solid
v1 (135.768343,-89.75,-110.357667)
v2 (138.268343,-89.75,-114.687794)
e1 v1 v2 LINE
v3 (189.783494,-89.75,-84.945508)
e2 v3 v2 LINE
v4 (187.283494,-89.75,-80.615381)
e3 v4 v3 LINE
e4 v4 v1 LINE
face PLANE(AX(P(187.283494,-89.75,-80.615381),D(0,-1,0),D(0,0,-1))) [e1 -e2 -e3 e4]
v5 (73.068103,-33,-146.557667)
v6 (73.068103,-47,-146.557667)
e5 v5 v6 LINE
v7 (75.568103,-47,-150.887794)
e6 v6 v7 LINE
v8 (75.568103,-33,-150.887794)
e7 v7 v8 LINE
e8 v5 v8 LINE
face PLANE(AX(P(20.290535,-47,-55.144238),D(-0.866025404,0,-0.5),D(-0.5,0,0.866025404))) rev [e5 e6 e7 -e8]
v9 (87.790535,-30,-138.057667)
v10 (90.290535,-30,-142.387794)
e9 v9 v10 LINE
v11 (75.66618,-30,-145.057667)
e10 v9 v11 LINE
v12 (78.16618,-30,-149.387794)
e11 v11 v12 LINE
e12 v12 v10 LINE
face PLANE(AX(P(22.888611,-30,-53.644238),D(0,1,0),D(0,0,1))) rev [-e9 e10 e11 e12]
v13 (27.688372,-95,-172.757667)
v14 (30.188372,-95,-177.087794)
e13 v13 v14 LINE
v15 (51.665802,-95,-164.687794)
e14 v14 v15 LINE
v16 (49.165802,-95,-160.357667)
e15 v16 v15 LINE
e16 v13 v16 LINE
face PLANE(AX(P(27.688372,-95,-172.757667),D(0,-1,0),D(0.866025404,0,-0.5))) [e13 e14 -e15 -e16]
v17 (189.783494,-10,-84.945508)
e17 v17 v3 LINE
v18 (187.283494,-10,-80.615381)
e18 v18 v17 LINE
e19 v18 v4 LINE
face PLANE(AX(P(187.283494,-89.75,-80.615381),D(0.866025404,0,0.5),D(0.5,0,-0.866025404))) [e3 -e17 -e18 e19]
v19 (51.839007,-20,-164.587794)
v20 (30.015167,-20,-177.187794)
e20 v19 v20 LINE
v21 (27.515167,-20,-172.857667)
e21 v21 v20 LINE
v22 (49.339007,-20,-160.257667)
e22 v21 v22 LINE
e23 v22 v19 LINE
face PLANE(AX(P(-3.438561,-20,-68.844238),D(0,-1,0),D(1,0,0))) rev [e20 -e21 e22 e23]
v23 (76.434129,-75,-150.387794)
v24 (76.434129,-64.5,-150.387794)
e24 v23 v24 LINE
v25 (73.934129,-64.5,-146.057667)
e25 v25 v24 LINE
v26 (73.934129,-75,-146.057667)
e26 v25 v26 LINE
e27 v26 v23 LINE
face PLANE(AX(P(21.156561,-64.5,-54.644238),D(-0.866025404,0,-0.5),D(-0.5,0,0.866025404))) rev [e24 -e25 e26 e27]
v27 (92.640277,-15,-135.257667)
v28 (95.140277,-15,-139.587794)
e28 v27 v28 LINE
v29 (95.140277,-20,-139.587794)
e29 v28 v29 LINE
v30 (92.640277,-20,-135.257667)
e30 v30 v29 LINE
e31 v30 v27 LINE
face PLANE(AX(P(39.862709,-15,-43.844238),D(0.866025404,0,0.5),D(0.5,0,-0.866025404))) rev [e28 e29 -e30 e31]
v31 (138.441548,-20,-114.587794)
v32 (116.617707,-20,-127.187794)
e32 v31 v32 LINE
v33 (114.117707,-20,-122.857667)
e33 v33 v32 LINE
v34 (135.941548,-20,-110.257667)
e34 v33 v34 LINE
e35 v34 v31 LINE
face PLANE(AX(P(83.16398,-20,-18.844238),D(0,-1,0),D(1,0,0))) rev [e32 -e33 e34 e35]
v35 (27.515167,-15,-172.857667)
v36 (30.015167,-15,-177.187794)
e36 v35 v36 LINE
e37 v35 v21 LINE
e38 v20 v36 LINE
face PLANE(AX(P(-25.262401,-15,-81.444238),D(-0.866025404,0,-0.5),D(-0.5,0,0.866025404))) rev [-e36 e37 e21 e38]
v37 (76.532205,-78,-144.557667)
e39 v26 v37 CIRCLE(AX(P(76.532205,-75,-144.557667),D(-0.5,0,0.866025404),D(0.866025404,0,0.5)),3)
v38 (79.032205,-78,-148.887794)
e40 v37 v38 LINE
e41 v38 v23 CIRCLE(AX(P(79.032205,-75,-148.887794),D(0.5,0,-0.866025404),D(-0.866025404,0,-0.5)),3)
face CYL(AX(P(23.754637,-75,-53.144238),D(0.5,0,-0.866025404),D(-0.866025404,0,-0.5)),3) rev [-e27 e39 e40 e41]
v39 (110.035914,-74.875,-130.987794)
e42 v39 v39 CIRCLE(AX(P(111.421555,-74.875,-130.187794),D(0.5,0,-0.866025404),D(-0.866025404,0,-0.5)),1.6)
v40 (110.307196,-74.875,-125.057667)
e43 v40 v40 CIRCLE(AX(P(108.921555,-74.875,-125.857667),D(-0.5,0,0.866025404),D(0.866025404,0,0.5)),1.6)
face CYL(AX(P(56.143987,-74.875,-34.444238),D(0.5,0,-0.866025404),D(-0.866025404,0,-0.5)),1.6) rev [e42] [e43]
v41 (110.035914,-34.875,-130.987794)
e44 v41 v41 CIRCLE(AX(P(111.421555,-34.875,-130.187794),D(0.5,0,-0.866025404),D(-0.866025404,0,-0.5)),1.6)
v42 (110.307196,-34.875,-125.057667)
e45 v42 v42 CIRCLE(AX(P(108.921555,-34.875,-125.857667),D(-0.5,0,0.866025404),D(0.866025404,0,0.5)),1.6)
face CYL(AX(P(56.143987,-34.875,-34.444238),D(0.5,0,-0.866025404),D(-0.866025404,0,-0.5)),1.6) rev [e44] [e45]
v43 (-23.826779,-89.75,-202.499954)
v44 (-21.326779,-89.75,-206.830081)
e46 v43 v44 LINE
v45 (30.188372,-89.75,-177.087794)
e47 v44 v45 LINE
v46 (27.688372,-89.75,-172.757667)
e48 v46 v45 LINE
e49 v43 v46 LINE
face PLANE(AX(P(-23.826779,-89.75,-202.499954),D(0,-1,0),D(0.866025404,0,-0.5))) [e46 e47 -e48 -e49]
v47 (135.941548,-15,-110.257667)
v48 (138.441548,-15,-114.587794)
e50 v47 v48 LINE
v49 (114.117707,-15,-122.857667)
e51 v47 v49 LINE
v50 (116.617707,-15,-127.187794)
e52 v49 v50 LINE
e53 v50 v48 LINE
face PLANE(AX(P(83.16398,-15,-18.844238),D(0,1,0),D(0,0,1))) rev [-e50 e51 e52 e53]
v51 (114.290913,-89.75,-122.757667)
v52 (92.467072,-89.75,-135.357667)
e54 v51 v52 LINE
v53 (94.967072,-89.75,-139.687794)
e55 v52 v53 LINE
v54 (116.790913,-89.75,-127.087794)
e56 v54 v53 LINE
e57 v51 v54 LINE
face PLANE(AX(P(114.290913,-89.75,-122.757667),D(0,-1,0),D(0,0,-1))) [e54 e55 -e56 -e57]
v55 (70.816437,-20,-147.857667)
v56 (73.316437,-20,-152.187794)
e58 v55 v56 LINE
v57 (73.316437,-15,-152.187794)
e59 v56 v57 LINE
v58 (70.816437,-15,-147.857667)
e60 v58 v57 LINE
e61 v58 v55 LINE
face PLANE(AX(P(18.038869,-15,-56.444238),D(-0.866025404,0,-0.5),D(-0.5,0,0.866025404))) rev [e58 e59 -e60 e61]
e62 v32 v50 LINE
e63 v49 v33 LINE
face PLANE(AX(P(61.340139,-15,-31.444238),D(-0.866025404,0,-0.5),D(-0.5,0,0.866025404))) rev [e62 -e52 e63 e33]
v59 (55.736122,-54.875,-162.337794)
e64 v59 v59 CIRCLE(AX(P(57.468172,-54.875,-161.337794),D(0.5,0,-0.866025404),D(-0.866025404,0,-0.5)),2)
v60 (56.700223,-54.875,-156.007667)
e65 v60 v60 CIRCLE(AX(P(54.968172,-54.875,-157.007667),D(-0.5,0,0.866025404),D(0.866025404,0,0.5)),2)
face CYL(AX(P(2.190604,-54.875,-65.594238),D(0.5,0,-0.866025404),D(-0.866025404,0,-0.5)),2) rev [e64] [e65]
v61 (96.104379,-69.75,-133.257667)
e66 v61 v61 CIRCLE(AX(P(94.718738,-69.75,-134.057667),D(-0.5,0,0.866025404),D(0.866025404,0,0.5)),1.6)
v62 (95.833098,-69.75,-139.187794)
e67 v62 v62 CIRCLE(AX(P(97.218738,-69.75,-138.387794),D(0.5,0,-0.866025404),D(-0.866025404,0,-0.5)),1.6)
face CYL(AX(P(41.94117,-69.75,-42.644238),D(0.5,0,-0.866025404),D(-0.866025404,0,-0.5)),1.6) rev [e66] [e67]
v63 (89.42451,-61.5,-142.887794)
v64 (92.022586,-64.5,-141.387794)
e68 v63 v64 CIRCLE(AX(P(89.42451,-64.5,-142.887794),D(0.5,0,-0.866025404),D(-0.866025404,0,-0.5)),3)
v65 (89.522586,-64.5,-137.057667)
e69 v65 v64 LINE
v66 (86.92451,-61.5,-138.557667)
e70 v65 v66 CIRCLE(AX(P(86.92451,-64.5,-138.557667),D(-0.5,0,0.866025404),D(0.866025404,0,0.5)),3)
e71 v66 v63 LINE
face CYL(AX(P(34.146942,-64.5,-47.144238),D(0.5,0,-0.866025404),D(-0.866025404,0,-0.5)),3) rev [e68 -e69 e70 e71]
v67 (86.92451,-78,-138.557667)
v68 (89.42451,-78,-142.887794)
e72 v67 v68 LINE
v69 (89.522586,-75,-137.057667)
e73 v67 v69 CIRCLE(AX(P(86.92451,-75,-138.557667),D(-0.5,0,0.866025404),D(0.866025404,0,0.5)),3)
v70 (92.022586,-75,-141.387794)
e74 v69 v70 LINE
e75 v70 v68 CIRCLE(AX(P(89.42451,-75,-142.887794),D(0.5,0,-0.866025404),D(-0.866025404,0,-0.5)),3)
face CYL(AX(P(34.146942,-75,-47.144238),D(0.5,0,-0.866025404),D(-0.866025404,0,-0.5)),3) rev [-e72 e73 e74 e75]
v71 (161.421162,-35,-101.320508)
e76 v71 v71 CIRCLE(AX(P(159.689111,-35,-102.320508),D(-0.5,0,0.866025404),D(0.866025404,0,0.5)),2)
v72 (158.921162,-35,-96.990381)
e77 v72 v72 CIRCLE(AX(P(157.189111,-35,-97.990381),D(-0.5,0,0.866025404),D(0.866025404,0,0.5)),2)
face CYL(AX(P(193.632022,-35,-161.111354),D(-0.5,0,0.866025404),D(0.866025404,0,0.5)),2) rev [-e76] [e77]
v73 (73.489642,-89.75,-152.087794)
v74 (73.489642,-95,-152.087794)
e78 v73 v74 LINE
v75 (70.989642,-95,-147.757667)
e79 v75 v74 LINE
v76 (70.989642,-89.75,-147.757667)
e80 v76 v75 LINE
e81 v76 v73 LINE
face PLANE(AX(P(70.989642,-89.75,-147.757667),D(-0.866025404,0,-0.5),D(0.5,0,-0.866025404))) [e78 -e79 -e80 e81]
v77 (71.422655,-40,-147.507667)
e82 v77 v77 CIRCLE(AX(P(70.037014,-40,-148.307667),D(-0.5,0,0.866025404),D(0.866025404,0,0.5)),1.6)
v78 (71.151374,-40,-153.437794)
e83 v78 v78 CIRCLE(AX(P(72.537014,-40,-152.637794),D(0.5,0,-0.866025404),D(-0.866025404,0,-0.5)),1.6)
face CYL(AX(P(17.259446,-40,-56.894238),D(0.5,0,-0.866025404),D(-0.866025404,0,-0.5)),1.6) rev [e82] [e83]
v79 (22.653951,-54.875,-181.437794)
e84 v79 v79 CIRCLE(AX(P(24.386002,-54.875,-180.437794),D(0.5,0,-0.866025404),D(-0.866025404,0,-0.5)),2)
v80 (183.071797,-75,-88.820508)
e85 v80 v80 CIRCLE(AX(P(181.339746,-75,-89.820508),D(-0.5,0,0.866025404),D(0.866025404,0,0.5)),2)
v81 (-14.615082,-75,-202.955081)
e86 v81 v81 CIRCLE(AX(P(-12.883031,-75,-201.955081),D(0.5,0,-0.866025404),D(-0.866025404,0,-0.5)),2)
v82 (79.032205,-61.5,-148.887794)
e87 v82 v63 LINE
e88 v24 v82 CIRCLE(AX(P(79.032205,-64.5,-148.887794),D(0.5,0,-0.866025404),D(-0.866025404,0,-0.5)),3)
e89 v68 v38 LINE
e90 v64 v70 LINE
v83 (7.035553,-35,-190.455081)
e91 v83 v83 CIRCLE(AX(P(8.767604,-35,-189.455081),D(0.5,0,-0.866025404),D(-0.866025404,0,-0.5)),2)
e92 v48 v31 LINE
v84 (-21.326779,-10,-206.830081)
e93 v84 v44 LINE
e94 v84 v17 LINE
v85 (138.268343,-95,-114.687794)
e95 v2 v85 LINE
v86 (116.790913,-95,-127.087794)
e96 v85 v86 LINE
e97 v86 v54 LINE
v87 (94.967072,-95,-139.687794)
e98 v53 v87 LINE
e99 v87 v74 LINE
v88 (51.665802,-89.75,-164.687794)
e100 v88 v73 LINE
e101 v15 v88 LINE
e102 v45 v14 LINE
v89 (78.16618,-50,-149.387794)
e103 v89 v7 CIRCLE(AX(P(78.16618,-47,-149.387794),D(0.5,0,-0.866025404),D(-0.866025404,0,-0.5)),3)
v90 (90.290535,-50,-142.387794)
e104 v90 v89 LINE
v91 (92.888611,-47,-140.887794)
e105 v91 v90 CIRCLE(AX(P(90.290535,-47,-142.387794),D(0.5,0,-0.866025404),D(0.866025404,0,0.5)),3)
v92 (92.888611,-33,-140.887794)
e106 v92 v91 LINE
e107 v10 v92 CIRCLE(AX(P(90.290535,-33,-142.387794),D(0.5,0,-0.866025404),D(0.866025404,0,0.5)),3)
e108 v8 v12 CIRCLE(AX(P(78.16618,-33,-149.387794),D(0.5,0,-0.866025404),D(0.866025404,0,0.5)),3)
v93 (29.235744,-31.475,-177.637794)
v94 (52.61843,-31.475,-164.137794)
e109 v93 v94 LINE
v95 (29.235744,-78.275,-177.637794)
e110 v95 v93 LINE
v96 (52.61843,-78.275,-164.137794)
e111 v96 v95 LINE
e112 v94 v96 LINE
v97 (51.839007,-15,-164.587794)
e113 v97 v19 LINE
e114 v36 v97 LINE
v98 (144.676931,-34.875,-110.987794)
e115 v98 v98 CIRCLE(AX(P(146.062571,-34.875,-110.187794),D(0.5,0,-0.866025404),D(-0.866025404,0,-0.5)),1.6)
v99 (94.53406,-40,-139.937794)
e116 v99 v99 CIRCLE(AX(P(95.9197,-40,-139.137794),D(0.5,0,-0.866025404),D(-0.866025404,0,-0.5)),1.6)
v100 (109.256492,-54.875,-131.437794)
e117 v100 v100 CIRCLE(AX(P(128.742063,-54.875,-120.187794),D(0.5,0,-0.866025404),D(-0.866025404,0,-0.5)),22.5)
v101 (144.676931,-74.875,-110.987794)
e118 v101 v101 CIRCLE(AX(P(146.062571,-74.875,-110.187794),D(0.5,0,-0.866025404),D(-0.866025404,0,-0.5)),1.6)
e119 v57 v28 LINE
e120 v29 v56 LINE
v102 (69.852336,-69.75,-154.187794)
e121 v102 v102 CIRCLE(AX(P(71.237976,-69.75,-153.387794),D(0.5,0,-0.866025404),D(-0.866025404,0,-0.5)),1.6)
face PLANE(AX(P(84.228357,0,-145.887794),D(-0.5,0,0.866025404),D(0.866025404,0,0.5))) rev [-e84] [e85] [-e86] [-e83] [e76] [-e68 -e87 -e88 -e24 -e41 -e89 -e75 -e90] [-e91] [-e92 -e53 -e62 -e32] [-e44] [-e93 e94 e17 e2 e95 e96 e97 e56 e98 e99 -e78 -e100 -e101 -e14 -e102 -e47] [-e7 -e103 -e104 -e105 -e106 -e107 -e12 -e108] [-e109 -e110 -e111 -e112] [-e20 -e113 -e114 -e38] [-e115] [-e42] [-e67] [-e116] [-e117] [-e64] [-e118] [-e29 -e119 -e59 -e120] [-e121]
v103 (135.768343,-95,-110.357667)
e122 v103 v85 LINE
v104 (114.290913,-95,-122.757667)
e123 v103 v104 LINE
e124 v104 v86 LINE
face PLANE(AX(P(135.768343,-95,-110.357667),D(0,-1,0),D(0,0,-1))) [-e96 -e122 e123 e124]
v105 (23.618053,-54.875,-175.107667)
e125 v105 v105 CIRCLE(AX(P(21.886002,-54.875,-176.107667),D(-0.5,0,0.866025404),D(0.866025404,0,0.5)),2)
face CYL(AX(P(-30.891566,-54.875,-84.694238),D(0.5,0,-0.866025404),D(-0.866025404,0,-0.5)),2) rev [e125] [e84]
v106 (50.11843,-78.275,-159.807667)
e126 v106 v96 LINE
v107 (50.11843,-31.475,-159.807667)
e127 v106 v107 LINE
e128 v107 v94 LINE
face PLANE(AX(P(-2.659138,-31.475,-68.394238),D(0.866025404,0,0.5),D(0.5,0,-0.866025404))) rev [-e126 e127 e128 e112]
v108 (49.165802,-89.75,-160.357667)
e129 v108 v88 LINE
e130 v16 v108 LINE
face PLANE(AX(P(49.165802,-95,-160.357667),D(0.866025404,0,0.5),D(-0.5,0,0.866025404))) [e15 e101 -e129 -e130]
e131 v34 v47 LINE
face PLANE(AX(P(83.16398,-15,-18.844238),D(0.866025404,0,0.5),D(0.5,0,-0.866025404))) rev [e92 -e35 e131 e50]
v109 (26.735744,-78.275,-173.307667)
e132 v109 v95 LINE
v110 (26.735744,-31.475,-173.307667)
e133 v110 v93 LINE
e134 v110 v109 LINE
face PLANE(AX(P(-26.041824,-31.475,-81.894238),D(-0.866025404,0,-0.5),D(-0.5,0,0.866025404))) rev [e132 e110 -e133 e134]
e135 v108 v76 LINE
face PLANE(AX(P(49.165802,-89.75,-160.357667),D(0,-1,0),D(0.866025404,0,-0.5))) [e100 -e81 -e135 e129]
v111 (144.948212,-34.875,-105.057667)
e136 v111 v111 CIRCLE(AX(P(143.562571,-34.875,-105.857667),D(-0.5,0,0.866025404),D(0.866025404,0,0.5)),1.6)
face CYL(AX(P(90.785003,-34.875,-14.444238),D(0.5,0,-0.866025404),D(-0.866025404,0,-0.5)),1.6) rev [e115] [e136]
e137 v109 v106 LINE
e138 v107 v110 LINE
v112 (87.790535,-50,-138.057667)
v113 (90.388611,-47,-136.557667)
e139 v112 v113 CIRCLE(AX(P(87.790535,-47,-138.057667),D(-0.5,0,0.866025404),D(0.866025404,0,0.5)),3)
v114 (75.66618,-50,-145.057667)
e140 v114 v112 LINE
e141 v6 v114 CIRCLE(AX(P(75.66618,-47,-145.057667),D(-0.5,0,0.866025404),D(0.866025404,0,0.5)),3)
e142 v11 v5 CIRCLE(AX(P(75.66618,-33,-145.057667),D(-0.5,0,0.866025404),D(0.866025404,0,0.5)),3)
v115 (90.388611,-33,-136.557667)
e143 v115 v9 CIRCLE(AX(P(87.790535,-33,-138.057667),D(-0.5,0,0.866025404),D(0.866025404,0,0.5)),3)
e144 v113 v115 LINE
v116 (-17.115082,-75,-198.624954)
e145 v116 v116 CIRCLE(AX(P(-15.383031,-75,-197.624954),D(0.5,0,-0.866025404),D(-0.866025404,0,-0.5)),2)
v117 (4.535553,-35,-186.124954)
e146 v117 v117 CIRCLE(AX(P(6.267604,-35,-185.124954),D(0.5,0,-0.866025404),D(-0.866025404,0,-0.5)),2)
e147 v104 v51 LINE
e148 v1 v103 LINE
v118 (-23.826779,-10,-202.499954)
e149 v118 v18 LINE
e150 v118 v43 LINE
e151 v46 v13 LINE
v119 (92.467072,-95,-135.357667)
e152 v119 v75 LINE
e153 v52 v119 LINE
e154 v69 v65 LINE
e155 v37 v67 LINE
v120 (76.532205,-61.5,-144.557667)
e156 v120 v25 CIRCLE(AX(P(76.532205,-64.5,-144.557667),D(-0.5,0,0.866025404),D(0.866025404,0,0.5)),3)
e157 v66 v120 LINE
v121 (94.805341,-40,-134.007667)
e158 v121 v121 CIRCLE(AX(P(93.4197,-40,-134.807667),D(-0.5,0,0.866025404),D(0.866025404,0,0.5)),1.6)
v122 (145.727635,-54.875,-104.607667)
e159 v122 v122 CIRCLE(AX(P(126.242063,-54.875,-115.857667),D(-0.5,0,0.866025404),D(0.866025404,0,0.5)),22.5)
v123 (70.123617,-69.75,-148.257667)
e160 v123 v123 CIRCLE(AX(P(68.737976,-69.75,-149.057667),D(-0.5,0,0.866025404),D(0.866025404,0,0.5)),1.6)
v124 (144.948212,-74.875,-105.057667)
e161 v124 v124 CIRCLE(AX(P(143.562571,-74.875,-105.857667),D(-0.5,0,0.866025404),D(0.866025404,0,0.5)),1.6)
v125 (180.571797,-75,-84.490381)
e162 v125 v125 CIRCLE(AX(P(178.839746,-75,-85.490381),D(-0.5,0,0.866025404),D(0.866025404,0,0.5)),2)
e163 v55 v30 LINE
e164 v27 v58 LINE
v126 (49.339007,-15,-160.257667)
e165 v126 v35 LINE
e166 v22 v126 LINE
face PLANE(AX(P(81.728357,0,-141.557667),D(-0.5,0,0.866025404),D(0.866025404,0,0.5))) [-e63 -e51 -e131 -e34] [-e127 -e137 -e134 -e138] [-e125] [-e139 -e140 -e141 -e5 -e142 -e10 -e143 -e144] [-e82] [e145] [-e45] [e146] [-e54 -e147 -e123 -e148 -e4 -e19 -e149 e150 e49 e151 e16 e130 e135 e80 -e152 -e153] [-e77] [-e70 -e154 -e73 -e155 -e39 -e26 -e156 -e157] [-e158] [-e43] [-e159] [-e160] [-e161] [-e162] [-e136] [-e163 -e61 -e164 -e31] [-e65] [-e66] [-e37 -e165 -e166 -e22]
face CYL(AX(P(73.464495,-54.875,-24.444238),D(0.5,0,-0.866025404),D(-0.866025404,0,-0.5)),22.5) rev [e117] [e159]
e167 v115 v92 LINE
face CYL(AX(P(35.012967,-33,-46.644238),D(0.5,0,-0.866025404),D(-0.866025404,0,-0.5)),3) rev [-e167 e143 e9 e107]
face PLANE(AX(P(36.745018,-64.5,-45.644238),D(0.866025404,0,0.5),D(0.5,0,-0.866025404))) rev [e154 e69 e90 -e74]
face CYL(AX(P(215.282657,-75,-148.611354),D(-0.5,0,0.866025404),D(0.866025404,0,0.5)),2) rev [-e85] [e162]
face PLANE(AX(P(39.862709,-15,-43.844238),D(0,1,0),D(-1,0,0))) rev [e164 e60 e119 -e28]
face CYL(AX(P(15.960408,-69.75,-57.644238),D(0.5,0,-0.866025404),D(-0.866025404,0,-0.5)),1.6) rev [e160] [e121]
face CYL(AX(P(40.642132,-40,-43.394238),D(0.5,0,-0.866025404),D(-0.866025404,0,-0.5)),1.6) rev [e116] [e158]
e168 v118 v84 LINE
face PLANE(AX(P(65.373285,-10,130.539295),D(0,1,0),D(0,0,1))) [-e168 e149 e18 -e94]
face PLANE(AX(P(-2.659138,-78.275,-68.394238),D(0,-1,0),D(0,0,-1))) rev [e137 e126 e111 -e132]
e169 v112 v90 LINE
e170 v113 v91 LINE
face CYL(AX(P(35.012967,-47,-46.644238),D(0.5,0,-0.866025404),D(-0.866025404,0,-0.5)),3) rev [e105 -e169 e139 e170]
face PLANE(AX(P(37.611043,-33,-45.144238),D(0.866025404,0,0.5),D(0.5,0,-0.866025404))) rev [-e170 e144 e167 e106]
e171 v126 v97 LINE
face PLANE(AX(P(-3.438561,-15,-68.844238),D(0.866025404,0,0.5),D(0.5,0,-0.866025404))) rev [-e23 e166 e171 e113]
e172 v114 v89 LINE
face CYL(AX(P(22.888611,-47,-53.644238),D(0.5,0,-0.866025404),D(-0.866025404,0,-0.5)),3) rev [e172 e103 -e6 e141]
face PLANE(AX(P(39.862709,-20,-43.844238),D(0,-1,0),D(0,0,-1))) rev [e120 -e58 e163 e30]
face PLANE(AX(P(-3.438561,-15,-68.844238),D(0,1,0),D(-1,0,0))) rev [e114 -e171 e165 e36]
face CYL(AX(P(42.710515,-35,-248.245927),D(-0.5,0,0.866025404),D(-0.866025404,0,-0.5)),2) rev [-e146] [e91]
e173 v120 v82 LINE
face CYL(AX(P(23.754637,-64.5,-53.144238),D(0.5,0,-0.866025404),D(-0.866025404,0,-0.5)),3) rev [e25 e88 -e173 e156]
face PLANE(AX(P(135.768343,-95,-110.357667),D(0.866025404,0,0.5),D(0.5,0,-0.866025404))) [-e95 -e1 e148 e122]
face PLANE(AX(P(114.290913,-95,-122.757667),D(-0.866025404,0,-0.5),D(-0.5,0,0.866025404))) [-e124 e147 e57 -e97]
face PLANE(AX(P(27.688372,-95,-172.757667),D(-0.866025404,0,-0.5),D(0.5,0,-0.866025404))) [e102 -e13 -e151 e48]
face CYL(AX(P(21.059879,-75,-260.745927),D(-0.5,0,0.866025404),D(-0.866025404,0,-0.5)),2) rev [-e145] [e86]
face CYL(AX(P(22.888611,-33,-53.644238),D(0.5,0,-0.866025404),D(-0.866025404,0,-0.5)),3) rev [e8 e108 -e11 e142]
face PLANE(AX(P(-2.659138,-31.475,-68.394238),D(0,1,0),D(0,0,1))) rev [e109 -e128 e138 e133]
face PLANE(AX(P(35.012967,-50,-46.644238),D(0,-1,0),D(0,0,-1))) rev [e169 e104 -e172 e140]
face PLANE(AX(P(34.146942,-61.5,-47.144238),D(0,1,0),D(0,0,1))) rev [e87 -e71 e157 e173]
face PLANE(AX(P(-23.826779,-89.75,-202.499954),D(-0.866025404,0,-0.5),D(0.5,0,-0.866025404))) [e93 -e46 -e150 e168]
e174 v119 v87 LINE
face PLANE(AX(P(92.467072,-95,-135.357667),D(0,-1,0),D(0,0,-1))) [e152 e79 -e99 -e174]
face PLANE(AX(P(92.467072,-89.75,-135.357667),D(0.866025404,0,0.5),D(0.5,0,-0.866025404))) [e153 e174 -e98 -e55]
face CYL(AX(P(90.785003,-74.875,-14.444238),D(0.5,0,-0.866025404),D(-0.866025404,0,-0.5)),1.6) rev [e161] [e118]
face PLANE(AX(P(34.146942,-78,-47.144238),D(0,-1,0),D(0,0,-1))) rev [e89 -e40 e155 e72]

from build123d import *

# Parameters (mm, degrees)
STOCK_ACRYLIC_BAY_WALL_MASTER_1_START     = 163.456714755
STOCK_ACRYLIC_BAY_WALL_MASTER_1_OUTLINE_R = 2
STOCK_ACRYLIC_BAY_WALL_MASTER_1_DEPTH     = 5
SKETCH1_W                                 = 243.769145362
SKETCH1_H                                 = 5
BOSS_EXTRUDE1_DEPTH                       = 5
SKETCH2_W                                 = 25.2
SKETCH2_H                                 = 5
CUT_EXTRUDE1_DEPTH                        = 158.991773268
SKETCH3_R                                 = 1.6
CUT_EXTRUDE2_DEPTH                        = 158.991773268
SKETCH4_R                                 = 2
SKETCH4_W                                 = 27
SKETCH4_H                                 = 46.8
CUT_EXTRUDE3_DEPTH                        = 158.991773268
SKETCH5_R                                 = 22.5
SKETCH5_R_2                               = 1.6
CUT_EXTRUDE4_DEPTH                        = 158.991773268


# Read off the part's stored shape, not the designer's step: Stock-acrylic-bay-wall-master-1
with BuildPart() as part:
    # Stock-acrylic-bay-wall-master-1 outline → Stock-acrylic-bay-wall-master-1 (new body)
    with BuildSketch(Plane(origin=(0, 0, 0), x_dir=(0.866025403784438, 0, 0.500000000000001), z_dir=(0.500000000000001, 0, -0.866025403784438)).offset(STOCK_ACRYLIC_BAY_WALL_MASTER_1_START)):
        Polygon((-121.884572681, 15), (121.884572681, 15), (121.884572681, 89.75), (62.4, 89.75), (62.4, 95), (37.6, 95), (37.6, 89.75), (12.4, 89.75), (12.4, 95), (-12.4, 95), (-12.4, 89.75), (-37.6, 89.75), (-37.6, 95), (-62.4, 95), (-62.4, 89.75), (-121.884572681, 89.75), align=None)
        with Locations((-87.134572681, 35)):
            Circle(STOCK_ACRYLIC_BAY_WALL_MASTER_1_OUTLINE_R, mode=Mode.SUBTRACT)
        with Locations((87.134572681, 35)):
            Circle(STOCK_ACRYLIC_BAY_WALL_MASTER_1_OUTLINE_R, mode=Mode.SUBTRACT)
        with Locations((-112.134572681, 75)):
            Circle(STOCK_ACRYLIC_BAY_WALL_MASTER_1_OUTLINE_R, mode=Mode.SUBTRACT)
        with Locations((112.134572681, 75)):
            Circle(STOCK_ACRYLIC_BAY_WALL_MASTER_1_OUTLINE_R, mode=Mode.SUBTRACT)
    extrude(amount=STOCK_ACRYLIC_BAY_WALL_MASTER_1_DEPTH)

    # Sketch1 → Boss-Extrude1 (add)
    with BuildSketch(Plane(origin=(84.228357378, 0, -145.887794416), x_dir=(-0.8660254037844382, 0, -0.5000000000000009), z_dir=(0.5000000000000009, 0, -0.8660254037844382))):
        with Locations((0, -12.5)):
            Rectangle(SKETCH1_W, SKETCH1_H)
    extrude(amount=-BOSS_EXTRUDE1_DEPTH)

    # Sketch2 → Cut-Extrude1 (cut, through all)
    with BuildSketch(Plane(origin=(84.228357378, 0, -145.887794416), x_dir=(-0.8660254037844382, 0, -0.5000000000000009), z_dir=(0.5000000000000009, 0, -0.8660254037844382))):
        with Locations((-50, -17.5)):
            Rectangle(SKETCH2_W, SKETCH2_H)
        with Locations((0, -17.5)):
            Rectangle(SKETCH2_W, SKETCH2_H)
        with Locations((50, -17.5)):
            Rectangle(SKETCH2_W, SKETCH2_H)
    extrude(amount=-CUT_EXTRUDE1_DEPTH, mode=Mode.SUBTRACT)

    # Sketch3 → Cut-Extrude2 (cut, through all)
    with BuildSketch(Plane(origin=(84.228357378, 0, -145.887794416), x_dir=(-0.8660254037844382, 0, -0.5000000000000009), z_dir=(0.5000000000000009, 0, -0.8660254037844382))):
        with Locations((13.5, -40)):
            Circle(SKETCH3_R)
        with Locations((-13.5, -40)):
            Circle(SKETCH3_R)
        with Locations((15, -69.75)):
            Circle(SKETCH3_R)
        with Locations((-15, -69.75)):
            Circle(SKETCH3_R)
        with BuildLine():
            Line((10, -47), (10, -33))
            ThreePointArc((10, -33), (9.121320344, -30.878679656), (7, -30))
            Line((7, -30), (-7, -30))
            ThreePointArc((-7, -30), (-9.121320344, -30.878679656), (-10, -33))
            Line((-10, -33), (-10, -47))
            ThreePointArc((-10, -47), (-9.121320344, -49.121320344), (-7, -50))
            Line((-7, -50), (7, -50))
            ThreePointArc((7, -50), (9.121320344, -49.121320344), (10, -47))
        make_face()
        with BuildLine():
            Line((-6, -61.5), (6, -61.5))
            ThreePointArc((6, -61.5), (8.121320344, -62.378679656), (9, -64.5))
            Line((9, -64.5), (9, -75))
            ThreePointArc((9, -75), (8.121320344, -77.121320344), (6, -78))
            Line((6, -78), (-6, -78))
            ThreePointArc((-6, -78), (-8.121320344, -77.121320344), (-9, -75))
            Line((-9, -75), (-9, -64.5))
            ThreePointArc((-9, -64.5), (-8.121320344, -62.378679656), (-6, -61.5))
        make_face()
    extrude(amount=-CUT_EXTRUDE2_DEPTH, mode=Mode.SUBTRACT)

    # Sketch4 → Cut-Extrude3 (cut, through all)
    with BuildSketch(Plane(origin=(84.228357378, 0, -145.887794416), x_dir=(-0.8660254037844382, 0, -0.5000000000000009), z_dir=(0.5000000000000009, 0, -0.8660254037844382))):
        with Locations((69.1, -54.875)):
            Circle(SKETCH4_R)
        with Locations((30.9, -54.875)):
            Circle(SKETCH4_R)
        with Locations((50, -54.875)):
            Rectangle(SKETCH4_W, SKETCH4_H)
    extrude(amount=-CUT_EXTRUDE3_DEPTH, mode=Mode.SUBTRACT)

    # Sketch5 → Cut-Extrude4 (cut, through all)
    with BuildSketch(Plane(origin=(84.228357378, 0, -145.887794416), x_dir=(-0.8660254037844382, 0, -0.5000000000000009), z_dir=(0.5000000000000009, 0, -0.8660254037844382))):
        with Locations((-51.4, -54.875)):
            Circle(SKETCH5_R)
        with Locations((-71.4, -34.875)):
            Circle(SKETCH5_R_2)
        with Locations((-31.4, -34.875)):
            Circle(SKETCH5_R_2)
        with Locations((-31.4, -74.875)):
            Circle(SKETCH5_R_2)
        with Locations((-71.4, -74.875)):
            Circle(SKETCH5_R_2)
    extrude(amount=-CUT_EXTRUDE4_DEPTH, mode=Mode.SUBTRACT)


solid = part.part
